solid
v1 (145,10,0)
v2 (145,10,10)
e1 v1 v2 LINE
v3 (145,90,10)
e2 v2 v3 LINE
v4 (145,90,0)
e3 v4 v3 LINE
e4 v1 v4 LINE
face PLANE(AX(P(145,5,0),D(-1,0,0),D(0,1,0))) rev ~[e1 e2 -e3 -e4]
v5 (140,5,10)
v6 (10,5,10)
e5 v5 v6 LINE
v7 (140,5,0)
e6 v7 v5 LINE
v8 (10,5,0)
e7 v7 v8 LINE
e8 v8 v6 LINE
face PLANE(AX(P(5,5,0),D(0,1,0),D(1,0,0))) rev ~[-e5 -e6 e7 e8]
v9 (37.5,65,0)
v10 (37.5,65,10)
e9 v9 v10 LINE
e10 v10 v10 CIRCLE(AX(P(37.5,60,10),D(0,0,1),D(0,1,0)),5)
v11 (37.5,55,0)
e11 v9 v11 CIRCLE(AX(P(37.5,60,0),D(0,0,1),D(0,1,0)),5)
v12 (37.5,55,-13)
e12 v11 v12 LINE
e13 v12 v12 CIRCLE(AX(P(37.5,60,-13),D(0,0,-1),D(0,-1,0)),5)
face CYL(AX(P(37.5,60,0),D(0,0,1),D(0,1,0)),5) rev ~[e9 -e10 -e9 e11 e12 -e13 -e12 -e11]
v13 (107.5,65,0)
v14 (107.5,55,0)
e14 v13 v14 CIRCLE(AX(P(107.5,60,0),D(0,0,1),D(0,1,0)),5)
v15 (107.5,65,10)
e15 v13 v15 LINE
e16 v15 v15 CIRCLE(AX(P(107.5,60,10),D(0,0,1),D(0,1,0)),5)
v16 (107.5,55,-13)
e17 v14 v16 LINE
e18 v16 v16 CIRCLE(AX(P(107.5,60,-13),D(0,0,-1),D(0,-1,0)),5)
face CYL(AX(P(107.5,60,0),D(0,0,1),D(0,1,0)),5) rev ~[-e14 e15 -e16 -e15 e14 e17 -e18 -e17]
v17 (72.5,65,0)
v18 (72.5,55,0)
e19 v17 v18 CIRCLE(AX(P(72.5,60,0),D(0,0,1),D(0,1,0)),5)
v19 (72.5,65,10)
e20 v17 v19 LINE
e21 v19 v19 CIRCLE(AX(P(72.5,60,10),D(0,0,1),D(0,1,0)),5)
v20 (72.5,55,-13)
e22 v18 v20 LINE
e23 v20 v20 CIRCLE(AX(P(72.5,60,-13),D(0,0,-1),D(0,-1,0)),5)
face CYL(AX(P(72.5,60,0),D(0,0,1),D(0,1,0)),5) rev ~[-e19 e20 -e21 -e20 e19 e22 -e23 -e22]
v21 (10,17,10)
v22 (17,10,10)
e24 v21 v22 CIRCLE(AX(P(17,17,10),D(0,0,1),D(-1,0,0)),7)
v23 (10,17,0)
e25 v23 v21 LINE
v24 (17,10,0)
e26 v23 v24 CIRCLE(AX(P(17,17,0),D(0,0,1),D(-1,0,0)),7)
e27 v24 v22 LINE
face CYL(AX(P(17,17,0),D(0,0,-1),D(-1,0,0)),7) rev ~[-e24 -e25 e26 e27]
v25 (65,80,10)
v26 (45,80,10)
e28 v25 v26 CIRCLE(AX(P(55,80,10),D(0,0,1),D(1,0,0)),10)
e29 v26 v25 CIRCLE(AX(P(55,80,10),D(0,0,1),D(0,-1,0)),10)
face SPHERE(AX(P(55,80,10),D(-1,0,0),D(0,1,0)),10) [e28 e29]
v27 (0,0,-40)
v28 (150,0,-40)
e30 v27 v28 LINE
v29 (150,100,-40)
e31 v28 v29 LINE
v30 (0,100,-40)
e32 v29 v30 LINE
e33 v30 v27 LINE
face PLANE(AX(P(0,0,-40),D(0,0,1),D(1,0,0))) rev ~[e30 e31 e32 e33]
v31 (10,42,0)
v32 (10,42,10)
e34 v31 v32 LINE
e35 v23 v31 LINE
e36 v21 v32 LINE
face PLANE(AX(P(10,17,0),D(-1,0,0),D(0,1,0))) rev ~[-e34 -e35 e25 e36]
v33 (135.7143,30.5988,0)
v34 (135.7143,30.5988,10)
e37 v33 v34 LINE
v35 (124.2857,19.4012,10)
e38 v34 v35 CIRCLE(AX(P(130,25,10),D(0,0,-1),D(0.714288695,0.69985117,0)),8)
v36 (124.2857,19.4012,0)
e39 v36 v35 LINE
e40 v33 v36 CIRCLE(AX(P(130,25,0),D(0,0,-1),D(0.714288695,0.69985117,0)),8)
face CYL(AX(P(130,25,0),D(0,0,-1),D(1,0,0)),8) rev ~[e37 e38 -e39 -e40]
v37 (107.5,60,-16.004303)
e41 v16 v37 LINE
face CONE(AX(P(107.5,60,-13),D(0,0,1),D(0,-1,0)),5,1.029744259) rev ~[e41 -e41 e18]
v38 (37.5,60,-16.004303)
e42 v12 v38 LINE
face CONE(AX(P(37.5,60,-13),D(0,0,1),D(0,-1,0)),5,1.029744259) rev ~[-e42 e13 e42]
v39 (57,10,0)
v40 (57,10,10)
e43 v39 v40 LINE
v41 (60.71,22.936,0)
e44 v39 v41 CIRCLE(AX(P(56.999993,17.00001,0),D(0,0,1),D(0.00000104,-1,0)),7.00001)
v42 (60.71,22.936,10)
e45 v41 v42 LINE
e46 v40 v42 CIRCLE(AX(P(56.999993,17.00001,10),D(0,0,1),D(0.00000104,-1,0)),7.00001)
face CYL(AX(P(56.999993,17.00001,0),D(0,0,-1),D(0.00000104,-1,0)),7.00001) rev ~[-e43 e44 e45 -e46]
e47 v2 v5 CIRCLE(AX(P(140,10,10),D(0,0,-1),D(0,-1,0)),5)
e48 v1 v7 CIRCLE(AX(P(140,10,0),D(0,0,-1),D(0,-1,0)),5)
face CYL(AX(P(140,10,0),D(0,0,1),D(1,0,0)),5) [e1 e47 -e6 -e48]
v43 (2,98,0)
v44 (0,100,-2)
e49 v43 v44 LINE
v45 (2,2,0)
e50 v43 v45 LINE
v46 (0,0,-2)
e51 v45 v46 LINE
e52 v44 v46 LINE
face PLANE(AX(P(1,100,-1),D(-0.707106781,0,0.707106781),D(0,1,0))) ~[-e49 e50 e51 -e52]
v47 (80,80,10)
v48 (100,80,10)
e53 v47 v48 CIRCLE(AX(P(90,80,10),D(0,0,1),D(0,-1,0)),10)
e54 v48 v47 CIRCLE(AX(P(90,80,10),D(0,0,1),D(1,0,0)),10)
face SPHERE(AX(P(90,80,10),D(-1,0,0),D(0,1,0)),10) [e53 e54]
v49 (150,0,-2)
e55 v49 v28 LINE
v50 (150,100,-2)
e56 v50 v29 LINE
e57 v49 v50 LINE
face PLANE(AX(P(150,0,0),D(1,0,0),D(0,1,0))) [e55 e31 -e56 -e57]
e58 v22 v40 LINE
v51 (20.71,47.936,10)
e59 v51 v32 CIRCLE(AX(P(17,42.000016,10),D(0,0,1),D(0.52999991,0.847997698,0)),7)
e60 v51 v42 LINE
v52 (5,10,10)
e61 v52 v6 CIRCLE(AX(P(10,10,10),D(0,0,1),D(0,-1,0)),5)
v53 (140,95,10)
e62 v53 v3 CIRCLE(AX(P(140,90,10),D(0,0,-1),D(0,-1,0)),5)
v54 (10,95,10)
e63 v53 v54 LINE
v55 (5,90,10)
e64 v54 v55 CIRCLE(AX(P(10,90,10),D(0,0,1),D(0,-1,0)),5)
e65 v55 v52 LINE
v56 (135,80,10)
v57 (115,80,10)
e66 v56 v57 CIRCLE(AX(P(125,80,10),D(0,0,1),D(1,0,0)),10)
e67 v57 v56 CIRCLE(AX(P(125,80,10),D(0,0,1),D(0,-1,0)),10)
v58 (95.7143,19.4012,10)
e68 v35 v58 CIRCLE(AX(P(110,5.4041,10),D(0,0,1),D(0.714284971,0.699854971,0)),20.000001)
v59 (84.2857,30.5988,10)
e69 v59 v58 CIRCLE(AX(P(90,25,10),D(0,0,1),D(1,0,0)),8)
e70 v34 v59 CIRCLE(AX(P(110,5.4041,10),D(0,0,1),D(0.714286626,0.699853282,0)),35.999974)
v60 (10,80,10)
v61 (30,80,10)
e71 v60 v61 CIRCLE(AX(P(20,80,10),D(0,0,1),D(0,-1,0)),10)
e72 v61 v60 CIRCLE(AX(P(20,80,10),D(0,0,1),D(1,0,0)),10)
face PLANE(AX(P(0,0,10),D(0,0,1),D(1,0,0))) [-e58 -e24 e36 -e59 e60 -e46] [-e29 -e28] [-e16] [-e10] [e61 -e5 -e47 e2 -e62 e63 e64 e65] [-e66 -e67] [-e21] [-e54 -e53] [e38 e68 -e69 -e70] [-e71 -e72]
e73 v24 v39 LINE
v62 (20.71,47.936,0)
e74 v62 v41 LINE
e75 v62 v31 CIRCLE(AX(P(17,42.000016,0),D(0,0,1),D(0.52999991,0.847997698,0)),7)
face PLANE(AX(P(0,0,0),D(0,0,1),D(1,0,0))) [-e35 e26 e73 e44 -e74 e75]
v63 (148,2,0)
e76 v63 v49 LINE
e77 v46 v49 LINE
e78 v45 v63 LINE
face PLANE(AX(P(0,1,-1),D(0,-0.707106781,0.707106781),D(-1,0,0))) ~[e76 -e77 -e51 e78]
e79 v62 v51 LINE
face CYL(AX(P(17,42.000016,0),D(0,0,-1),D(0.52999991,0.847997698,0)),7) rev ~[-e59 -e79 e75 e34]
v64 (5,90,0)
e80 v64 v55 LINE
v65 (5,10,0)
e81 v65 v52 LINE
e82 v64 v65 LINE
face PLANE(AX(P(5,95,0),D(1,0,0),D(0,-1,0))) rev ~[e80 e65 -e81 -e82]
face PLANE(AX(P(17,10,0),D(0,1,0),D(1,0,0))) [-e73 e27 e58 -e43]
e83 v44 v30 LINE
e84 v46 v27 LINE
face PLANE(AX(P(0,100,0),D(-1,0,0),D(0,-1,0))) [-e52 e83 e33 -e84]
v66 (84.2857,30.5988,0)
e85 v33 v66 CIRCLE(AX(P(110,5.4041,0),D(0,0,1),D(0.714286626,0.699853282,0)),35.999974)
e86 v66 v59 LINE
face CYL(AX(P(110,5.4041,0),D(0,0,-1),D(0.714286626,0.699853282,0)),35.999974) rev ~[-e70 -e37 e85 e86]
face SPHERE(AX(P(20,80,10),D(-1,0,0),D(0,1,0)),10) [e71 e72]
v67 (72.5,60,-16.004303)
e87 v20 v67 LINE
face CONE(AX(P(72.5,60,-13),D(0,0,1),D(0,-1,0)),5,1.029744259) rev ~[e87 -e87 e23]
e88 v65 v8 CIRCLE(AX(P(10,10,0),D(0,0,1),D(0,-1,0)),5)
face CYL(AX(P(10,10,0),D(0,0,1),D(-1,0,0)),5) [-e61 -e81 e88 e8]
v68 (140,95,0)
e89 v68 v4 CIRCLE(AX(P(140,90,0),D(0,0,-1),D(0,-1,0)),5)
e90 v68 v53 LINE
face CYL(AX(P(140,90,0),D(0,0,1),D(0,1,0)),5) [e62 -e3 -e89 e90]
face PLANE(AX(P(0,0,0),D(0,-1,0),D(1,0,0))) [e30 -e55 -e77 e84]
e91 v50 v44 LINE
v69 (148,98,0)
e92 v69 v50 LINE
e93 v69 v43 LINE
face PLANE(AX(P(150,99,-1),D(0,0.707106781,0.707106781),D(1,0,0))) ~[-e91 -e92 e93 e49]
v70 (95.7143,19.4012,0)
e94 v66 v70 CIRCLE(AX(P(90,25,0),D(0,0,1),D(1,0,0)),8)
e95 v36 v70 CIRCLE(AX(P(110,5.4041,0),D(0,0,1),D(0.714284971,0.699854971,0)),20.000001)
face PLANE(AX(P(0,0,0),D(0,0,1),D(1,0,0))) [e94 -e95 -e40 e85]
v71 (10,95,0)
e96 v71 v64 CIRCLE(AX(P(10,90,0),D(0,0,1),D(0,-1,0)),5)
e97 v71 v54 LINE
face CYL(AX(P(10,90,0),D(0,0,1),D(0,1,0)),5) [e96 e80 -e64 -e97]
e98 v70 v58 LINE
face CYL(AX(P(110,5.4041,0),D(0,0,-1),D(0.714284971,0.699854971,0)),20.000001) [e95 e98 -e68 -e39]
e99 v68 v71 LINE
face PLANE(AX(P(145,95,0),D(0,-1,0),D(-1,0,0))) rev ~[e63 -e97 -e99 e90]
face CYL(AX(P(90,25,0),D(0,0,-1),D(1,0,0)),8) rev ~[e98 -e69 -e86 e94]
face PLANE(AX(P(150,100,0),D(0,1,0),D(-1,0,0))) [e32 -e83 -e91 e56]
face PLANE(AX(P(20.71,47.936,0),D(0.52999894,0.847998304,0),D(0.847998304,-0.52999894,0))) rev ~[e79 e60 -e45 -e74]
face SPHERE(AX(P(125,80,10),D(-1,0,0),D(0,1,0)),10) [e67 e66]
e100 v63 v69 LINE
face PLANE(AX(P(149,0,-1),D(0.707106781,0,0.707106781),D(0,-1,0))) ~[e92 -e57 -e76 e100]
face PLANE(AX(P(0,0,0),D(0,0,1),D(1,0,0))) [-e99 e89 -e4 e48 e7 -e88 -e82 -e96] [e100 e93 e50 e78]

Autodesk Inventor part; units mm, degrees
ref_plane "YZ Plane" through (0, 0, 0) normal (1, 0, 0) x (0, 1, 0)
ref_plane "XZ Plane" through (0, 0, 0) normal (0, 1, 0) x (-1, 0, 0)
ref_plane "XY Plane" through (0, 0, 0) normal (0, 0, 1) x (1, 0, 0)
sketch "Sketch1" plane through (0, 0, 0) normal (0, 0, 1) x (1, 0, 0)
  line L0 (0, 0) -> (150, 0)
  line L1 (150, 0) -> (150, 100)
  line L2 (150, 100) -> (0, 100)
  line L3 (0, 100) -> (0, 0)
  line L4 (5, 5) -> (145, 5)
  line L5 (145, 5) -> (145, 95)
  line L6 (145, 95) -> (5, 95)
  line L7 (5, 95) -> (5, 5)
  circle A0 centre (37.5, 60) radius 5
  line L8 (5, 60) -> (145, 60) construction
  circle A1 centre (72.5, 60) radius 5
  circle A2 centre (107.5, 60) radius 5
  arc A3 (10, 17) -> (17, 10) centre (17, 17) ccw
  arc A4 (57, 10) -> (60.71, 22.936) centre (57, 17) ccw
  arc A5 (20.71, 47.936) -> (10, 42) centre (17, 42) ccw
  line L9 (17, 10) -> (57, 10)
  line L10 (20.71, 47.936) -> (60.71, 22.936)
  line L11 (10, 17) -> (10, 42)
  circle A6 centre (130, 25) radius 8
  circle A7 centre (90, 25) radius 8
  line L12 (90, 25) -> (145, 25) construction
  arc A8 (124.2857, 19.4012) -> (95.7143, 19.4012) centre (110, 5.4041) ccw
  arc A9 (90.0041, 5) -> (90.0154, 4.6201) centre (110, 5.4041) ccw
  arc A10 (135.7143, 30.5988) -> (84.2857, 30.5988) centre (110, 5.4041) ccw
  dimension "d0" = 150
  dimension "d1" = 100
  dimension "d2" = 140
  dimension "d19" = 35
  dimension "d25" = 17
  dimension "d26" = 17
  dimension "d28" = 40
  dimension "d30" = 25
  dimension "d31" = 16
  dimension "d32" = 25
  dimension "d33" = 20
  dimension "d34" = 40
  dimension "d35" = 25
  dimension "d102" = 5
  dimension "d103" = 5
  dimension "d104" = 40
  dimension "d106" = 37.5
  dimension "d107" = 10
  dimension "d108" = 20
  dimension "d109" = 5
  dimension "d111" = 36
  dimension "d112" = 7
  dimension "d113" = 7
  dimension "d115" = 16
  dimension "d116" = 10
  dimension "d120" = 47.1699
  dimension "d121" = 40
extrude "Extrusion1" add sketch "Sketch1" against normal blind 40 contours L3 L2 L1 L0 | L7 L6 L5 L4 | A0 | A1 | A2 | L11 A5 L10 A4 L9 A3 | A6 | A6 A8 A7 A10 | A7
extrude "Extrusion2" add sketch "Sketch1" along normal blind 10 contours L7 L6 L5 L4
extrude "Extrusion3" add sketch "Sketch1" along normal blind 10 contours A0 | A1 | A2
hole "Hole1" at (37.5, 60, 0) direction (0, 0, 1) diameter 10 end through all
hole "Hole2" at (72.5, 60, 0) direction (0, 0, 1) diameter 10 end through all
hole "Hole3" at (107.5, 60, 0) direction (0, 0, 1) diameter 10 end through all
hole "Hole4" at (37.5, 60, 0) direction (0, 0, -1) diameter 10 depth 13 tip angle 118
hole "Hole5" at (72.5, 60, 0) direction (0, 0, -1) diameter 10 depth 13 tip angle 118
hole "Hole6" at (107.5, 60, 0) direction (0, 0, -1) diameter 10 depth 13 tip angle 118
fillet "Fillet1" radius 5 1 edges at (145, 95, 5)
fillet "Fillet2" radius 5 3 edges at (5, 95, 5) (145, 5, 5) (5, 5, 5)
sketch "Sketch2" plane through (0, 0, 10) normal (0, 0, 1) x (1, 0, 0)
  arc A0 (30, 80) -> (10, 80) centre (20, 80) ccw
  line L0 (0, 100) -> (0, 0) projected
  line L1 (5, 10) -> (5, 90) construction
  line L2 (5, 80) -> (145, 80) construction
  line L3 (145, 90) -> (145, 10) construction
  line L4 (10, 80) -> (30, 80)
  arc A1 (65, 80) -> (45, 80) centre (55, 80) ccw
  line L5 (45, 80) -> (65, 80)
  arc A2 (100, 80) -> (80, 80) centre (90, 80) ccw
  line L6 (80, 80) -> (100, 80)
  arc A3 (135, 80) -> (115, 80) centre (125, 80) ccw
  line L7 (115, 80) -> (135, 80)
  dimension "d90" = 20
  dimension "d122" = 80
  dimension "d131" = 20
  dimension "d132" = 10
  dimension "d135" = 35
revolve "Revolution1" add sketch "Sketch2" angle 360 about axis through (5, 80, 10) along (1, 0, 0)
chamfer "Chamfer1" distance 2 angle 45 4 edges at (75, 100, 0) (150, 50, 0) (0, 50, 0) (75, 0, 0)
properties part number "tarefa 3"
